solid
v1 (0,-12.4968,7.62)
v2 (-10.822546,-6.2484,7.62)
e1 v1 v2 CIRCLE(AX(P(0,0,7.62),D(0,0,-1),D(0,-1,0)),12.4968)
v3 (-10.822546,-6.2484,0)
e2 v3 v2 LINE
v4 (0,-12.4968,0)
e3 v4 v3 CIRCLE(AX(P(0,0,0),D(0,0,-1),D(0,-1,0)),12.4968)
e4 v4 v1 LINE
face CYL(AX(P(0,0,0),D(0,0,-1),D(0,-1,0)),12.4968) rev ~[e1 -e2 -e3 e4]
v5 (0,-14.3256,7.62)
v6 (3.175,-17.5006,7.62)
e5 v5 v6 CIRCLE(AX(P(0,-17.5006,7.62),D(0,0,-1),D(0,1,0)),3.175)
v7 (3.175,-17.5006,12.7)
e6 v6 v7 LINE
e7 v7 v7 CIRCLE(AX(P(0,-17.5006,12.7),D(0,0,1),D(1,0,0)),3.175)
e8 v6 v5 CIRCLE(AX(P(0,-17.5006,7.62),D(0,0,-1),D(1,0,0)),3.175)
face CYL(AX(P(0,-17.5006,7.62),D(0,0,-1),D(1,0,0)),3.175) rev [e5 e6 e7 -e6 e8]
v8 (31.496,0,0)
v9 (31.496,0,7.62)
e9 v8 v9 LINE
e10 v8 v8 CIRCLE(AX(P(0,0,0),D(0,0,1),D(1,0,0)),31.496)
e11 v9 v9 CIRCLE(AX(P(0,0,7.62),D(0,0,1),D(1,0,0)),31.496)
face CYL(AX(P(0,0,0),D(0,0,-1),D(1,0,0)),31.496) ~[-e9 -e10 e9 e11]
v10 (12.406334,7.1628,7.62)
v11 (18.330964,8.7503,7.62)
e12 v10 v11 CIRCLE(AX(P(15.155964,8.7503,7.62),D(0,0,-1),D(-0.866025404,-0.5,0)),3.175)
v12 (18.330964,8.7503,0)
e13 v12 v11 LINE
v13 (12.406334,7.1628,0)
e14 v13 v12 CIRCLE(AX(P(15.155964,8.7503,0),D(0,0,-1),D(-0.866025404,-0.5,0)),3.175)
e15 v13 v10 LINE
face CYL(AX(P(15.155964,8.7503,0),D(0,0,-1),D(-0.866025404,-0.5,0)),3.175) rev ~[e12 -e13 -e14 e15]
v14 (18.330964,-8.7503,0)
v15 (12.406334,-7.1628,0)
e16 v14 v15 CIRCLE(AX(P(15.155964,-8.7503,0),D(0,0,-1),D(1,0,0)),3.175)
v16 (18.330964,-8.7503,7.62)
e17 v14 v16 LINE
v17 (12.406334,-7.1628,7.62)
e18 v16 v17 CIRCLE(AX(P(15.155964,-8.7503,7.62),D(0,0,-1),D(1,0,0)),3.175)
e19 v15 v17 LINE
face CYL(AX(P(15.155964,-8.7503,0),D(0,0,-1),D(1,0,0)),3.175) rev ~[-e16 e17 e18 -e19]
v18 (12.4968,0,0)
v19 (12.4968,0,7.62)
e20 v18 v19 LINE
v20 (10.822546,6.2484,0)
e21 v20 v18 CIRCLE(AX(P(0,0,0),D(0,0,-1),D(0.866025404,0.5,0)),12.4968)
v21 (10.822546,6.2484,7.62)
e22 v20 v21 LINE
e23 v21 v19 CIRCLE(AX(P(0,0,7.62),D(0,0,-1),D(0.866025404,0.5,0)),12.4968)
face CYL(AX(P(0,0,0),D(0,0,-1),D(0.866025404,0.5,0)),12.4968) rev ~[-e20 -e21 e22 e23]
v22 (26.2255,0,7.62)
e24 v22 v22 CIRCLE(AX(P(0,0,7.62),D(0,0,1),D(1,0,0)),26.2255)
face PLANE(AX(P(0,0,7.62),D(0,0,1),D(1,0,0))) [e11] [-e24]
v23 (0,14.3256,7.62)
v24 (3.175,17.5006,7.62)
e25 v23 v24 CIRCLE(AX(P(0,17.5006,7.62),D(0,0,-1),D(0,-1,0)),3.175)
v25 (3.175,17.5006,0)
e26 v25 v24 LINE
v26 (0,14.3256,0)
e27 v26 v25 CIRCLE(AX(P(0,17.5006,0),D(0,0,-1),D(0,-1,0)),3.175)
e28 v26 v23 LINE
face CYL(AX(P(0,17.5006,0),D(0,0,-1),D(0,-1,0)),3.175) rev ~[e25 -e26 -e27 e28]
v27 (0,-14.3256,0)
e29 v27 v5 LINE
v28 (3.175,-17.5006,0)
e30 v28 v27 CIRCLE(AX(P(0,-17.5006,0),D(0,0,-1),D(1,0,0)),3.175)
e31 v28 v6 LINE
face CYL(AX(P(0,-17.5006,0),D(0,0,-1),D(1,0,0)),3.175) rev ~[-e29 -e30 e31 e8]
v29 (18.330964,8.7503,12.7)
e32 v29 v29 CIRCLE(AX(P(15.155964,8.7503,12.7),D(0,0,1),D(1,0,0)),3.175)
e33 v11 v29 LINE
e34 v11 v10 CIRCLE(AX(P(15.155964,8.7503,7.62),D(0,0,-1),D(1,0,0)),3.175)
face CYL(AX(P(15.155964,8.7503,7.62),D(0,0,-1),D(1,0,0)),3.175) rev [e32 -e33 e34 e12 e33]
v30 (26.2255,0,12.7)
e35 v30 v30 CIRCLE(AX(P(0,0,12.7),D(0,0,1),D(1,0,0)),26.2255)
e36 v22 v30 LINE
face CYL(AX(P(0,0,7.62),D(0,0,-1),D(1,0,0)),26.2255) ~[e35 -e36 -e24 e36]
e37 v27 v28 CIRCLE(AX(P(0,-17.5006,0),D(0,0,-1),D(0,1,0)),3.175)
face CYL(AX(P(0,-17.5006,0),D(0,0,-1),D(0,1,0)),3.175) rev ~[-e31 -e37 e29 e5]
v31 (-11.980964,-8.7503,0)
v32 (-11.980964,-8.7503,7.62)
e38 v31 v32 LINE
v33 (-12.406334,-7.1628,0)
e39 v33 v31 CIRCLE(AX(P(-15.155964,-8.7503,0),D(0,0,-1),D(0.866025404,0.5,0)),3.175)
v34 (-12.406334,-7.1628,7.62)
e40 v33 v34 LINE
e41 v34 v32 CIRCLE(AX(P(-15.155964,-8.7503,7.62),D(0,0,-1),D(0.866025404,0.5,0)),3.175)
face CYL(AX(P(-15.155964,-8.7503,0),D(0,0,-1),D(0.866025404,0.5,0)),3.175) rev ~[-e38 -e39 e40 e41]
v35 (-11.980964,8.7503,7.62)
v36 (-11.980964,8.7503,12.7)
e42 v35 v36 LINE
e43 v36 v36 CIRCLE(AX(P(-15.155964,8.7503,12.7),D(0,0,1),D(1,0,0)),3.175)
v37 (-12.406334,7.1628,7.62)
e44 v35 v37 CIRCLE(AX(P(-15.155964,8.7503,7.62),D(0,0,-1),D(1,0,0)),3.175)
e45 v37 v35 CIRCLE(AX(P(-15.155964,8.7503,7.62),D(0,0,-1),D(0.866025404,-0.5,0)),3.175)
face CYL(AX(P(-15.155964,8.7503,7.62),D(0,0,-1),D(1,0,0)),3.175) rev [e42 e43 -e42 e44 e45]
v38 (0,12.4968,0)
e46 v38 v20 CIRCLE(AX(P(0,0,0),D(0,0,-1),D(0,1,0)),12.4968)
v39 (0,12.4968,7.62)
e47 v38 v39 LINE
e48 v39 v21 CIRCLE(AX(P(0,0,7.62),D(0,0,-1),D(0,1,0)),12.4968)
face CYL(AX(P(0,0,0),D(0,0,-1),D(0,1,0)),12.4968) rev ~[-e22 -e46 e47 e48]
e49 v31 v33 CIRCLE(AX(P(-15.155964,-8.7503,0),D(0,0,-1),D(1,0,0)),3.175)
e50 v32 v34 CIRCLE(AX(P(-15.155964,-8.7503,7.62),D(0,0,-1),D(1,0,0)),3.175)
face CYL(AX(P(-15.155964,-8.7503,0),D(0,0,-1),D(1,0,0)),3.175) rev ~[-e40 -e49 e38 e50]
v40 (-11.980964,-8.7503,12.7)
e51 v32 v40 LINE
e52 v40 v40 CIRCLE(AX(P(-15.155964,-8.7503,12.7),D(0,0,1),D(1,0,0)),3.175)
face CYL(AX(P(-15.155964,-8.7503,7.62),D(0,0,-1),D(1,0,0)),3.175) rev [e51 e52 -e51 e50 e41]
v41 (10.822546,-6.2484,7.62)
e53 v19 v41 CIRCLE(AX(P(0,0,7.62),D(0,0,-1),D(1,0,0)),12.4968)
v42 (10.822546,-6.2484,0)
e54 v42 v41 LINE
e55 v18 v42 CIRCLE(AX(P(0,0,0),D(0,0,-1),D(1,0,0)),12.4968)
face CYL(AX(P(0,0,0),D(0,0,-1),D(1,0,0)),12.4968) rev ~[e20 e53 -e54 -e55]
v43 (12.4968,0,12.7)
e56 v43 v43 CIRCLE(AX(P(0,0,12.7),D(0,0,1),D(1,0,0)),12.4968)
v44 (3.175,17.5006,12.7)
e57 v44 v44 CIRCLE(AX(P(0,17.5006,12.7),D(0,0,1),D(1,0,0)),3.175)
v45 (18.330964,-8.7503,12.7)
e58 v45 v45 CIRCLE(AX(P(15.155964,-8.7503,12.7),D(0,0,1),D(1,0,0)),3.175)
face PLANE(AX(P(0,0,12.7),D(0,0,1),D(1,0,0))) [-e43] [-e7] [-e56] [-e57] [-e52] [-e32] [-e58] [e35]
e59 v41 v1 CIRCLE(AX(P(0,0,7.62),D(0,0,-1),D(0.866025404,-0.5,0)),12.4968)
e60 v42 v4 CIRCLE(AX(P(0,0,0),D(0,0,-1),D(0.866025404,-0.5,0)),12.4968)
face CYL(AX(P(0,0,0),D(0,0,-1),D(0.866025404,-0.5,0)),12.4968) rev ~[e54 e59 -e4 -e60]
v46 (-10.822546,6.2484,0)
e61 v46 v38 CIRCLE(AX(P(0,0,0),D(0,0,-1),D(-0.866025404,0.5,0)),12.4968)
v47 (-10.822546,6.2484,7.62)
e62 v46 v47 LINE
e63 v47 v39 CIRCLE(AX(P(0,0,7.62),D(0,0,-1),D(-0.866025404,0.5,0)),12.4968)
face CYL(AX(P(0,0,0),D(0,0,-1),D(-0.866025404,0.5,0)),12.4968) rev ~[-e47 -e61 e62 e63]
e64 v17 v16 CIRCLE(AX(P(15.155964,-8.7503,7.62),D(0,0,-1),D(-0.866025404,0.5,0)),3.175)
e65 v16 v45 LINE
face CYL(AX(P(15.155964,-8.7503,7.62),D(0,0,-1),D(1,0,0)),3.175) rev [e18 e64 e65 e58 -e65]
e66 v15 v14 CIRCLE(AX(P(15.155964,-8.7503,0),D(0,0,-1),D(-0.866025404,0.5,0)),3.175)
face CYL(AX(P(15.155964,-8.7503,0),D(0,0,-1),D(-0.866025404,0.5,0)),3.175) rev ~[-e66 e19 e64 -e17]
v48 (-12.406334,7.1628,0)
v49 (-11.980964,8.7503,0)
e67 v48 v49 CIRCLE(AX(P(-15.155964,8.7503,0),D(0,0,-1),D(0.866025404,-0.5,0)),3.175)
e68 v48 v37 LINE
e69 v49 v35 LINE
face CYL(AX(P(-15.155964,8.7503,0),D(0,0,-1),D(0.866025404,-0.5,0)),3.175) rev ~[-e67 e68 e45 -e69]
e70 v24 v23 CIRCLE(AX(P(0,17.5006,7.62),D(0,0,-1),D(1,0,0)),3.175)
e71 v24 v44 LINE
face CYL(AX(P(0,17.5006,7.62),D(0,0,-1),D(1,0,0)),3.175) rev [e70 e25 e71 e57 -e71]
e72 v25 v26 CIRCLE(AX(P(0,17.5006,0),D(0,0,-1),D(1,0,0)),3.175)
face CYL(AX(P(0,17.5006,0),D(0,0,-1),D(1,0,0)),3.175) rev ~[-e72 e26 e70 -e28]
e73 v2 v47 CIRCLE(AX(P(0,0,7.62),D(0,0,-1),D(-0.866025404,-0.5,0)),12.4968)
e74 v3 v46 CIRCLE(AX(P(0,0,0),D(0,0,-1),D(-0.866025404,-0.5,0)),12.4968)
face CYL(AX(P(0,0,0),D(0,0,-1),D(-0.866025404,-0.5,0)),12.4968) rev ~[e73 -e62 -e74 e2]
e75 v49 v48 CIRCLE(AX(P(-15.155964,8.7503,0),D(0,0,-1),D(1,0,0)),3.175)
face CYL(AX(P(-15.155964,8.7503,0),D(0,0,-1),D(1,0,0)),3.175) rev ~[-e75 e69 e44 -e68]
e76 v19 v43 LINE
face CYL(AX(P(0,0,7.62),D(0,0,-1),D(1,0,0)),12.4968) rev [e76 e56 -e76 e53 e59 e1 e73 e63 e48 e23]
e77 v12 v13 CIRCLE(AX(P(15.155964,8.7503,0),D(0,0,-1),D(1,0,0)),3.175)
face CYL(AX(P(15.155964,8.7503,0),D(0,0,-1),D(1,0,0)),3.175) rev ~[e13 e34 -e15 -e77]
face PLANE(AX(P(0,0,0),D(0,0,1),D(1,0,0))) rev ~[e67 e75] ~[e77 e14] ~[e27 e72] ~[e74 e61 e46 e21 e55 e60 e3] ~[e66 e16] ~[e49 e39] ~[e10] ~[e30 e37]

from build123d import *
from build123d import SkipClean  # not in build123d's __all__

# Parameters (mm, degrees)
F0_R     = 31.496
F1_DEPTH = 7.62
F2_R     = 26.2255
F2_R_2   = 3.175
F2_R_3   = 12.4968
F3_DEPTH = 5.08


with BuildPart() as f1:
    # F0 (on Top) → F1 (new body)
    with BuildSketch(Plane.XY):
        Circle(F0_R)
        with BuildLine():
            ThreePointArc((-11.9809641815, -8.7503), (-18.2227786799, -9.5720504682), (-12.4063335245, -7.1628))
            ThreePointArc((-12.4063335245, -7.1628), (-12.089149683, -7.9285495318), (-11.9809641815, -8.7503))
        make_face(mode=Mode.SUBTRACT)
        with BuildLine():
            ThreePointArc((3.175, -17.5006), (-2.2450640303, -19.7456640303), (0, -14.3256))
            ThreePointArc((0, -14.3256), (2.2450640303, -15.2555359697), (3.175, -17.5006))
        make_face(mode=Mode.SUBTRACT)
        with BuildLine():
            ThreePointArc((18.3309641815, -8.7503), (14.3342137133, -11.8171144985), (12.4063335245, -7.1628))
            ThreePointArc((12.4063335245, -7.1628), (15.9777146497, -5.6834855015), (18.3309641815, -8.7503))
        make_face(mode=Mode.SUBTRACT)
        with BuildLine():
            ThreePointArc((-11.9809641815, 8.7503), (-12.089149683, 7.9285495318), (-12.4063335245, 7.1628))
            ThreePointArc((-12.4063335245, 7.1628), (-18.2227786799, 9.5720504682), (-11.9809641815, 8.7503))
        make_face(mode=Mode.SUBTRACT)
        with BuildLine():
            ThreePointArc((10.822546266, 6.2484), (12.070981866, 3.2344098428), (12.4968, 0))
            ThreePointArc((12.4968, 0), (12.070981866, -3.2344098428), (10.822546266, -6.2484))
            ThreePointArc((10.822546266, -6.2484), (6.2484, -10.822546266), (0, -12.4968))
            ThreePointArc((0, -12.4968), (-6.2484, -10.822546266), (-10.822546266, -6.2484))
            ThreePointArc((-10.822546266, -6.2484), (-12.4968, 0), (-10.822546266, 6.2484))
            ThreePointArc((-10.822546266, 6.2484), (-6.2484, 10.822546266), (0, 12.4968))
            ThreePointArc((0, 12.4968), (6.2484, 10.822546266), (10.822546266, 6.2484))
        make_face(mode=Mode.SUBTRACT)
        with BuildLine():
            ThreePointArc((18.3309641815, 8.7503), (15.9777146497, 5.6834855015), (12.4063335245, 7.1628))
            ThreePointArc((12.4063335245, 7.1628), (14.3342137133, 11.8171144985), (18.3309641815, 8.7503))
        make_face(mode=Mode.SUBTRACT)
        with BuildLine():
            ThreePointArc((3.175, 17.5006), (2.2450640303, 15.2555359697), (0, 14.3256))
            ThreePointArc((0, 14.3256), (-2.2450640303, 19.7456640303), (3.175, 17.5006))
        make_face(mode=Mode.SUBTRACT)
    extrude(amount=F1_DEPTH)

    # F2 (on face) → F3 (join)
    with BuildSketch(Plane.XY.offset(7.62)):
        Circle(F2_R)
        with Locations((-15.1559641815, -8.7503)):
            Circle(F2_R_2, mode=Mode.SUBTRACT)
        with Locations((0, -17.5006)):
            Circle(F2_R_2, mode=Mode.SUBTRACT)
        with Locations((15.1559641815, -8.7503)):
            Circle(F2_R_2, mode=Mode.SUBTRACT)
        with Locations((-15.1559641815, 8.7503)):
            Circle(F2_R_2, mode=Mode.SUBTRACT)
        Circle(F2_R_3, mode=Mode.SUBTRACT)
        with Locations((15.1559641815, 8.7503)):
            Circle(F2_R_2, mode=Mode.SUBTRACT)
        with Locations((0, 17.5006)):
            Circle(F2_R_2, mode=Mode.SUBTRACT)
    with SkipClean():  # cleaning this boolean's faces spoils the solid; the shape is the same uncleaned
        extrude(amount=F3_DEPTH)


solid = f1.part
